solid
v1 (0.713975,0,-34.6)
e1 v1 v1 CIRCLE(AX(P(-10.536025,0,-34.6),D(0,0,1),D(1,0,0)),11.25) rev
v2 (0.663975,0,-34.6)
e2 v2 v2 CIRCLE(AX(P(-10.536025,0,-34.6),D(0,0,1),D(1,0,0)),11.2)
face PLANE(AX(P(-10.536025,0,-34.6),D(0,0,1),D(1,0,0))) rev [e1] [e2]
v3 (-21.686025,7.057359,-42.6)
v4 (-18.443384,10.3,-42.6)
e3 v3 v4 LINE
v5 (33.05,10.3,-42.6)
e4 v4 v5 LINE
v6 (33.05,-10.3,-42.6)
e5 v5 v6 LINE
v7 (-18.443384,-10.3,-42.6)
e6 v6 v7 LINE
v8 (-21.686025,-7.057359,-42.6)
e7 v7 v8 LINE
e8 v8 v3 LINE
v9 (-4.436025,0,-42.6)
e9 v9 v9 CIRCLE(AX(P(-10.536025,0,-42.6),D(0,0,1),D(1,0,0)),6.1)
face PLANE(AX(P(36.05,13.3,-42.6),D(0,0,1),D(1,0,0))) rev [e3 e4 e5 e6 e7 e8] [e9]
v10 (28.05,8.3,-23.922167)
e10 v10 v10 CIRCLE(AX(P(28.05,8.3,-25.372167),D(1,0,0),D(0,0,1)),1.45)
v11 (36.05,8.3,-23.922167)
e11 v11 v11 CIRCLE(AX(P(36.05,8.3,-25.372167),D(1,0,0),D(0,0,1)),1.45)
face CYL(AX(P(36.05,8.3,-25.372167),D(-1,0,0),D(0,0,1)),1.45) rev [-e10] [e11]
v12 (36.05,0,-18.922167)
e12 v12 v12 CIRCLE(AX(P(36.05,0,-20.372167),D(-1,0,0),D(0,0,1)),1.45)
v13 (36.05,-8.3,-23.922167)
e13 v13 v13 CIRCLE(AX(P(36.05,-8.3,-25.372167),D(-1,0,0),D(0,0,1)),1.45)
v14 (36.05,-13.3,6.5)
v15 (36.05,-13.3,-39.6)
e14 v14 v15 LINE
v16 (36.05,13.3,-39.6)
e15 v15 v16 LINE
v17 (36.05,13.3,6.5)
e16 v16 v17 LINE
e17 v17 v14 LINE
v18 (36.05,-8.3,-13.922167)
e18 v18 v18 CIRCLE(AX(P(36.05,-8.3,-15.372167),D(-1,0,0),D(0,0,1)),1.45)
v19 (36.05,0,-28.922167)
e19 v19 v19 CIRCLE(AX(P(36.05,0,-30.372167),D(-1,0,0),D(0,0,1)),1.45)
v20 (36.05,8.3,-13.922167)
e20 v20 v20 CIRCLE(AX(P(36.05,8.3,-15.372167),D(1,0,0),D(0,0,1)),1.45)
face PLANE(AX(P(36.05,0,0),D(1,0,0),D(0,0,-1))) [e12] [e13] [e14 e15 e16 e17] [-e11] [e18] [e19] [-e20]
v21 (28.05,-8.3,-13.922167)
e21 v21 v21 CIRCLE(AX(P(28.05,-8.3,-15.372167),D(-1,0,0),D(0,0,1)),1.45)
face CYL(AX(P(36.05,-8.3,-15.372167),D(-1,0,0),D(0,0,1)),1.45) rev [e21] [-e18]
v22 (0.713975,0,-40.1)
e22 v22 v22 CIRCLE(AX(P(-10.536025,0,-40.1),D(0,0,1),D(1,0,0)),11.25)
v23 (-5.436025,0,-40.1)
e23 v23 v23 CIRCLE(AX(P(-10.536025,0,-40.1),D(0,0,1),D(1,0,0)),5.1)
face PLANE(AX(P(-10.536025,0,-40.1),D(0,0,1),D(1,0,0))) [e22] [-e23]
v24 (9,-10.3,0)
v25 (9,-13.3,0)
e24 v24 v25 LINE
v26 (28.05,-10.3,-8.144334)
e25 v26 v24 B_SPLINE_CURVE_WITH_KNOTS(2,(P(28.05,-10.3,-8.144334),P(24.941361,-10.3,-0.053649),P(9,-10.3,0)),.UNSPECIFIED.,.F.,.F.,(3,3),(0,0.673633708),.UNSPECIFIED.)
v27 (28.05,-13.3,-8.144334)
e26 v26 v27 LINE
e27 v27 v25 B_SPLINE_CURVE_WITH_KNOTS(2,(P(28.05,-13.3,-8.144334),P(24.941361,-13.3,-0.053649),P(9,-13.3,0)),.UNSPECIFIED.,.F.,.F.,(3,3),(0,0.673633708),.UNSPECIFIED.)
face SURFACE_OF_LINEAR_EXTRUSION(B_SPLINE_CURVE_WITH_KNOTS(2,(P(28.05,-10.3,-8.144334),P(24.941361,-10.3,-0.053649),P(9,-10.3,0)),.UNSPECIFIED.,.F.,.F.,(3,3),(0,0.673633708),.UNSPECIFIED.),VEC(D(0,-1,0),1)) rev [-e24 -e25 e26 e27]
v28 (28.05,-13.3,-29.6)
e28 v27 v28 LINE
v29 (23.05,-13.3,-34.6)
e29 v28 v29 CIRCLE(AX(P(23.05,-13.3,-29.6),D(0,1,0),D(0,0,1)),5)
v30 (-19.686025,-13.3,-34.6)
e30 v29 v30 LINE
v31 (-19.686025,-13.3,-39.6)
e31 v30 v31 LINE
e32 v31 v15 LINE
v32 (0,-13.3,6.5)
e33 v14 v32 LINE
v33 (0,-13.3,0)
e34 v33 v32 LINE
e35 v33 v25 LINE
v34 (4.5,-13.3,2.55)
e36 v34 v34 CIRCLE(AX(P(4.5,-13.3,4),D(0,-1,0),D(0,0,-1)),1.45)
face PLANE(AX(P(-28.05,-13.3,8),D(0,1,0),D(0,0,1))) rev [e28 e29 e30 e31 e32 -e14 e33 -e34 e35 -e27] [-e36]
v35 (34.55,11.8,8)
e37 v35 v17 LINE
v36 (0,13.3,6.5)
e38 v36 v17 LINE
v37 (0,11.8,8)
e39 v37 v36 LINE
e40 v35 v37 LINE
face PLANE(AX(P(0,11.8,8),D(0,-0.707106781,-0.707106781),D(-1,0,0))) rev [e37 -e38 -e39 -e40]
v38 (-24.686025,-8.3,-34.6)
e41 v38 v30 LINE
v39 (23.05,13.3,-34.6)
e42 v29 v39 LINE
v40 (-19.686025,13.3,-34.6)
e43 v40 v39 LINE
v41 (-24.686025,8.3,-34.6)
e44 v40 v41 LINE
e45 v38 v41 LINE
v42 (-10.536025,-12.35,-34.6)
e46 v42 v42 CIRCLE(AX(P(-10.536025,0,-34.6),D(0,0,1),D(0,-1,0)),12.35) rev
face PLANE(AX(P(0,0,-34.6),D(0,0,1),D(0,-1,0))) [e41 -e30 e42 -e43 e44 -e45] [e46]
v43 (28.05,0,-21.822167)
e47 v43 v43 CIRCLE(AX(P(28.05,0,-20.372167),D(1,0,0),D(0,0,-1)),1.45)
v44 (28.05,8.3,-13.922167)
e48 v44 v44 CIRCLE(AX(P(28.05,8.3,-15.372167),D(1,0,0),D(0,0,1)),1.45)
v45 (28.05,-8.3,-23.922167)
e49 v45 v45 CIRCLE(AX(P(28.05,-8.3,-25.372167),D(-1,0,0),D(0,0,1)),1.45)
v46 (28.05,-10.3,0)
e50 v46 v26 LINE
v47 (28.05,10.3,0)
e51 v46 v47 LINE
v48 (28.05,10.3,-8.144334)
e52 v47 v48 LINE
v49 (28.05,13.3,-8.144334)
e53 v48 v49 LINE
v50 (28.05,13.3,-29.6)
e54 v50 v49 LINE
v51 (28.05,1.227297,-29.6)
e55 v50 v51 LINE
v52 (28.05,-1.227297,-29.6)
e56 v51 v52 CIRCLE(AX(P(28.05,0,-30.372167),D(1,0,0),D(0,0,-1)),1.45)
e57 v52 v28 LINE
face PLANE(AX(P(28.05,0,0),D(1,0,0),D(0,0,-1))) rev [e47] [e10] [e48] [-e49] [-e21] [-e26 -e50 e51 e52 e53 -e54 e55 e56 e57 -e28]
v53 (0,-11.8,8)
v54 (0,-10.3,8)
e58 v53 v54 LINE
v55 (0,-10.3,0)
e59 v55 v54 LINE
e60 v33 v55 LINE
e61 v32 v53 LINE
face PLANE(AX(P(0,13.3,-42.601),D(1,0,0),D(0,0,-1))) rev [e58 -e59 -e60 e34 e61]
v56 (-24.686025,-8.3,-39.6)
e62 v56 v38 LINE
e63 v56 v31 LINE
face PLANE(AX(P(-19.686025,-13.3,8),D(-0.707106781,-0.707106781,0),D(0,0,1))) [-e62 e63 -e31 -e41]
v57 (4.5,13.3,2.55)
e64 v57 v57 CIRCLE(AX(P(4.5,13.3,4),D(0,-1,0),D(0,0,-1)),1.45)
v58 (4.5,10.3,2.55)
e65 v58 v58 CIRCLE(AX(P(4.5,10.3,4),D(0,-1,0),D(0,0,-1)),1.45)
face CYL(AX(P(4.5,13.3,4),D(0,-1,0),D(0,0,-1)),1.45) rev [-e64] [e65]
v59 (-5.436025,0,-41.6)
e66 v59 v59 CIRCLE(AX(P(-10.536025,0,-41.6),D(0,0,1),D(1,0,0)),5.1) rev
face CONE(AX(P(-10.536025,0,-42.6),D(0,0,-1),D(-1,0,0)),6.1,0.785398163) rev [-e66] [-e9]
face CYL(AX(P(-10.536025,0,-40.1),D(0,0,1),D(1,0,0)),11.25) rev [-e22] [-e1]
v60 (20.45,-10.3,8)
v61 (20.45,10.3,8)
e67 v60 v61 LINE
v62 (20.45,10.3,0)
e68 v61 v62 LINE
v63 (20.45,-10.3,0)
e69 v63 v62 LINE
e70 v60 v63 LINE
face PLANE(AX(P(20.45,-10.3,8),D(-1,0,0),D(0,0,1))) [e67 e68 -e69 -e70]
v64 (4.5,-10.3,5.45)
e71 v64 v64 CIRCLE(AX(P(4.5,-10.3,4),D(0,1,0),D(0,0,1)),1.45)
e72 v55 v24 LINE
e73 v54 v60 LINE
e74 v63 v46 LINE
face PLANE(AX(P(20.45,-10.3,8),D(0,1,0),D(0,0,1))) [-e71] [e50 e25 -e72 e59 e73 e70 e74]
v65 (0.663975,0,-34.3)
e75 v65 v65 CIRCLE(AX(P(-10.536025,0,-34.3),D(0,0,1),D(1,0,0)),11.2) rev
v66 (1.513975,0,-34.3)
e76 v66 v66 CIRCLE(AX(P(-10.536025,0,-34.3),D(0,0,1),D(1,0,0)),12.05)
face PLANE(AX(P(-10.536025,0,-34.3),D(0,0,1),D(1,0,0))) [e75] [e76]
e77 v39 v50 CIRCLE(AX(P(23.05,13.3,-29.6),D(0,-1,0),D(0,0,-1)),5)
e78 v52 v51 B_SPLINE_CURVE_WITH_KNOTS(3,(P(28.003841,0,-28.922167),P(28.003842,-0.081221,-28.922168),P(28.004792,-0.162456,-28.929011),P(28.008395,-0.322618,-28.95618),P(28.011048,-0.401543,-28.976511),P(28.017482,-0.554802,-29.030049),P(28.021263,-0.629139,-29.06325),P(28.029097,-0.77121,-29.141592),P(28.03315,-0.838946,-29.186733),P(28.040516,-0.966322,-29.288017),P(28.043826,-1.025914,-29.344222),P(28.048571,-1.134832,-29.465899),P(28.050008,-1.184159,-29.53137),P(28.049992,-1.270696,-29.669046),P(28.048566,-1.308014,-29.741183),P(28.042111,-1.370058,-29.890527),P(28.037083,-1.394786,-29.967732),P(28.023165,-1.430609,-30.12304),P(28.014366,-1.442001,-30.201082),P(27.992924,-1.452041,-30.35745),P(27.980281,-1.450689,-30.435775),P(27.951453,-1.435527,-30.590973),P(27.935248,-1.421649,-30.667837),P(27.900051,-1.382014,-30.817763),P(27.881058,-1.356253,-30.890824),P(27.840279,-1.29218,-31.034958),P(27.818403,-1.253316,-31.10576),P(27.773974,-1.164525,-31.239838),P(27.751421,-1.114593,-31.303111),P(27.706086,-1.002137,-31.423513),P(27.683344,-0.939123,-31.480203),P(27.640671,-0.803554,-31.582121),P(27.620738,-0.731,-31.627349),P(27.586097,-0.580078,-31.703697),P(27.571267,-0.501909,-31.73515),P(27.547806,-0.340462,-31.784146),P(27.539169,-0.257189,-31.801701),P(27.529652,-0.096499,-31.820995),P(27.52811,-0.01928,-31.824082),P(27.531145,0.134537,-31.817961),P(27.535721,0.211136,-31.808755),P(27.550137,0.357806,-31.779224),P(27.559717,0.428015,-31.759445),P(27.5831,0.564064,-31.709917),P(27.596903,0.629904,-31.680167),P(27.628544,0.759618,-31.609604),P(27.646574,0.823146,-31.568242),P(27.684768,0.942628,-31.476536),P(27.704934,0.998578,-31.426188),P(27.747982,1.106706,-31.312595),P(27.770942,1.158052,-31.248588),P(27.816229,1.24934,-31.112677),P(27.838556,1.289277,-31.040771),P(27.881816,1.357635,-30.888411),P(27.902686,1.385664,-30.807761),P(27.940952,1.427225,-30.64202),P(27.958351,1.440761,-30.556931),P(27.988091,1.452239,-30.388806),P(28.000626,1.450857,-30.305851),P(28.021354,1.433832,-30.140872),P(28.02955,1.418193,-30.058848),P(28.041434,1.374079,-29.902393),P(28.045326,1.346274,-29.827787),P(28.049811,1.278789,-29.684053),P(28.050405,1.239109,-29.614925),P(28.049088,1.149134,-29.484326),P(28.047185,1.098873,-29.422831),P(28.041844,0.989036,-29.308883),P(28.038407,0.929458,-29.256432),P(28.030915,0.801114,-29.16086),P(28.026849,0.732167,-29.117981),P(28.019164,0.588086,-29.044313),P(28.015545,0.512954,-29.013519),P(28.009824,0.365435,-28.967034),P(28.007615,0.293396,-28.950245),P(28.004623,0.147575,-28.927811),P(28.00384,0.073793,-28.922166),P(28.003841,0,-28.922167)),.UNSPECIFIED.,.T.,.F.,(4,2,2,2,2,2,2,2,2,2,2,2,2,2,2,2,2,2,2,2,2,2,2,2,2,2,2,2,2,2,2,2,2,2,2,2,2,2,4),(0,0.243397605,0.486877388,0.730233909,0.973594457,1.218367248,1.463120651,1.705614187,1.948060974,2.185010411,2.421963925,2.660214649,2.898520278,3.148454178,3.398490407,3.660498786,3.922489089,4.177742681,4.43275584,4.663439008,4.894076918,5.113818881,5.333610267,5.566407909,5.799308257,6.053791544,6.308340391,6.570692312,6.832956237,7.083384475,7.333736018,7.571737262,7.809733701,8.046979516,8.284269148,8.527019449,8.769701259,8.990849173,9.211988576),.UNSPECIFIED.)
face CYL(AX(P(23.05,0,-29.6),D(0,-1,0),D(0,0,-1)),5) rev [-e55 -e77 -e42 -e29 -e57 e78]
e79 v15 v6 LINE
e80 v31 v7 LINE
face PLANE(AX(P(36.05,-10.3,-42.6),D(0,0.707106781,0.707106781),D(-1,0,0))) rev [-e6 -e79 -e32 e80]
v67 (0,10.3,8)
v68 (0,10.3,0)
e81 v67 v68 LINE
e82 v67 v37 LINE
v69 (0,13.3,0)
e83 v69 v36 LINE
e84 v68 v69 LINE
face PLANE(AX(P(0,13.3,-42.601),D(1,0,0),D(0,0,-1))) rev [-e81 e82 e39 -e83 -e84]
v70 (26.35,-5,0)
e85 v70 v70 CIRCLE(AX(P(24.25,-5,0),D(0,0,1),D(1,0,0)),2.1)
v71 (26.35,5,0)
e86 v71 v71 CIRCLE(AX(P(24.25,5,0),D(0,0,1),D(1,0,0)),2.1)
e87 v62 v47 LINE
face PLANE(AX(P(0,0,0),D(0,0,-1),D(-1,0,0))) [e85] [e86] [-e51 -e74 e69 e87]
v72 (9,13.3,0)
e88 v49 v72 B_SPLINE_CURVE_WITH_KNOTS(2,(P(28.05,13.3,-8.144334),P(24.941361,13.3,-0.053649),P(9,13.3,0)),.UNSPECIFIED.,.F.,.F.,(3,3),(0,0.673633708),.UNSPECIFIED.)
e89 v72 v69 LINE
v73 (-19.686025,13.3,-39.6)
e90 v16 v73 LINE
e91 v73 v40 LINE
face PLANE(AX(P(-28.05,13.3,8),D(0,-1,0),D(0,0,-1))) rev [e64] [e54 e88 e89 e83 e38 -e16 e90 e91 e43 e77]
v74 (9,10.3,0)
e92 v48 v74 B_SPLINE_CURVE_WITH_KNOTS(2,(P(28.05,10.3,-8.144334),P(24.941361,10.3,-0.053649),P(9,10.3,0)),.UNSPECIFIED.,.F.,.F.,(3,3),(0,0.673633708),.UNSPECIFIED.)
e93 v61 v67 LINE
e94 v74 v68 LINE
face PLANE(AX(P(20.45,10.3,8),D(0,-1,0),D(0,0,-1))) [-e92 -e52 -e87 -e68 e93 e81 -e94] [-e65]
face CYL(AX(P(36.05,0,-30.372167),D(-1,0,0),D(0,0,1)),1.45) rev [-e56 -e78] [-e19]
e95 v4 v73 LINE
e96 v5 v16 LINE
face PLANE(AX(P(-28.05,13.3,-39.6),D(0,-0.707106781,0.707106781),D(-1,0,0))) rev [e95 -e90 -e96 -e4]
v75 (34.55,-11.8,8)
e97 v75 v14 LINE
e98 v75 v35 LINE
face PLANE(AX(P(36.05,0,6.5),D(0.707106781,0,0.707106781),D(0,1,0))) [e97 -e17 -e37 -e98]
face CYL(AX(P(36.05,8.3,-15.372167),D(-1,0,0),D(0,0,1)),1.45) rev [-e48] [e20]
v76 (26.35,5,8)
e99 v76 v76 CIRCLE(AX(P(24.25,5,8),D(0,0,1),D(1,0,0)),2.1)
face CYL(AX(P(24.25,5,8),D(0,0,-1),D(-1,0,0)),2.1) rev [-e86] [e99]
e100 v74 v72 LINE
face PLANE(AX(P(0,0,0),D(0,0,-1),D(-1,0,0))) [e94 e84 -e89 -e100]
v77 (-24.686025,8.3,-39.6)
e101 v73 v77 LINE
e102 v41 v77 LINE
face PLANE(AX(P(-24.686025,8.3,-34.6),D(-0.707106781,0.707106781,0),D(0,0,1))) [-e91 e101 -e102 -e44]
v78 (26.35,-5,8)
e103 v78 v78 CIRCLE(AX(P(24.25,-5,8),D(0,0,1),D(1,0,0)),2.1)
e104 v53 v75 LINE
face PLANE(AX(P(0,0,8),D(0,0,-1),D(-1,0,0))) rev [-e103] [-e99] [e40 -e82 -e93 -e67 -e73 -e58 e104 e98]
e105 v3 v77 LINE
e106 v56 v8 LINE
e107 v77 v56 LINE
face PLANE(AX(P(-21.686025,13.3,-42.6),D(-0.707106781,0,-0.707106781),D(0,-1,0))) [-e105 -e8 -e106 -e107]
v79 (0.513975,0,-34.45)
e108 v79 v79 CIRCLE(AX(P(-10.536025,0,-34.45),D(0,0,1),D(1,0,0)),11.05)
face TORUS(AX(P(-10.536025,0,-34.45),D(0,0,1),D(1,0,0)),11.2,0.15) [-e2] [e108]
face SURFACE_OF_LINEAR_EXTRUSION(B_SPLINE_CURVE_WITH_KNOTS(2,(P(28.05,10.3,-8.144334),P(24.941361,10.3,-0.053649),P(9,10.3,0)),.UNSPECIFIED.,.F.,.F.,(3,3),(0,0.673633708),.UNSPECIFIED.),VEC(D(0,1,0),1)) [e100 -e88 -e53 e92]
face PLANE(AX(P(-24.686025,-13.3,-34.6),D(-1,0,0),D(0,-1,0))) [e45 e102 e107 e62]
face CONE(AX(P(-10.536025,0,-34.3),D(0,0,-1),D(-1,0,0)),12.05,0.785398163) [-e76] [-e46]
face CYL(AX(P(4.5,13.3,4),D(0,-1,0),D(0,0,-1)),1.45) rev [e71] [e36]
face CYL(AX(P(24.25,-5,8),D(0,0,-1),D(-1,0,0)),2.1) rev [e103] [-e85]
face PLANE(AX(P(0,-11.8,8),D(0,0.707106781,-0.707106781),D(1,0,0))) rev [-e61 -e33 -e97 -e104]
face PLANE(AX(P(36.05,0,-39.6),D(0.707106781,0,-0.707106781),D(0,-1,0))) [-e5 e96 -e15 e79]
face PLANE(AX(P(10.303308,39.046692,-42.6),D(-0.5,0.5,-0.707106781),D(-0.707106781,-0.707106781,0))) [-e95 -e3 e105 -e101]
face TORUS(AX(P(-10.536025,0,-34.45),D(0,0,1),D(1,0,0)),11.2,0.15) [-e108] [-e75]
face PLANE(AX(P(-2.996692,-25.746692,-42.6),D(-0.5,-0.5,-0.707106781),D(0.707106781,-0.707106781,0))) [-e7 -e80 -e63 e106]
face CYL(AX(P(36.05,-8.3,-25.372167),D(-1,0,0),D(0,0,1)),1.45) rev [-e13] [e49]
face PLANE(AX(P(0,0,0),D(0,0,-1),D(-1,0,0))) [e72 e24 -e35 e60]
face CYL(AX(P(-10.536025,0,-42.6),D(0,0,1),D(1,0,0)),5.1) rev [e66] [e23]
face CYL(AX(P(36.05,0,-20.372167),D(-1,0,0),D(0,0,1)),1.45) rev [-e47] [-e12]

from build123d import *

# Parameters (mm, degrees)
CROQUIS1_W                 = 56.1
CROQUIS1_H                 = 26.6
CROQUIS1_R                 = 2.1
CROQUIS1_W_2               = 40.9
CROQUIS1_H_2               = 20.6
SALIENTE_EXTRUIR1_DEPTH    = 8
CROQUIS2_W                 = 50.6
CROQUIS2_H                 = 26.6
SALIENTE_EXTRUIR2_DEPTH    = 8
CROQUIS3_W                 = 60.73602496
CROQUIS3_H                 = 26.6
SALIENTE_EXTRUIR3_DEPTH    = 8
CROQUIS4_R                 = 11.25
CORTAR_EXTRUIR1_DEPTH      = 5.5
CROQUIS5_R                 = 5.1
CORTAR_EXTRUIR2_DEPTH      = 62.563808362
CROQUIS6_R                 = 12.05
CROQUIS6_R_2               = 11.05
SALIENTE_EXTRUIR4_DEPTH    = 0.3
CHAFL_N1_SIZE              = 0.3
REDONDEO1_R                = 0.15
CHAFL_N2_SIZE              = 5
CORTAR_EXTRUIR5_REACH      = 65.536
CROQUIS11_W                = 30.047801794
CROQUIS11_H                = 26.6
CROQUIS12_R                = 1.45
CORTAR_EXTRUIR6_DEPTH      = 62.821699265
CHAFL_N8_SIZE              = 3
CHAFL_N9_SIZE              = 1
CHAFL_N10_SIZE             = 1.5
SALIENTE_EXTRUIR7_DEPTH    = 3
REDONDEO3_R                = 5
CROQUIS14_R                = 1.45
CORTAR_EXTRUIR7_DEPTH      = 70.085008007
CORTAR_EXTRUIR8_DEPTH      = 70.085008007
CORTAR_EXTRUIR8_DEPTH_BACK = 70.085008007
CROQUIS15_R                = 1.45


with BuildPart() as part:
    # Croquis1 → Saliente-Extruir1 (new body)
    with BuildSketch(Plane.XY):
        Rectangle(CROQUIS1_W, CROQUIS1_H)
        with Locations((24.250000128, -5)):
            Circle(CROQUIS1_R, mode=Mode.SUBTRACT)
        with Locations((24.250000128, 5)):
            Circle(CROQUIS1_R, mode=Mode.SUBTRACT)
        with Locations((-24.249999872, -5)):
            Circle(CROQUIS1_R, mode=Mode.SUBTRACT)
        with Locations((-24.249999872, 5)):
            Circle(CROQUIS1_R, mode=Mode.SUBTRACT)
        Rectangle(CROQUIS1_W_2, CROQUIS1_H_2, mode=Mode.SUBTRACT)
    extrude(amount=SALIENTE_EXTRUIR1_DEPTH)

    # Croquis2 → Saliente-Extruir2 (add)
    with BuildSketch(Plane(origin=(28.05, 0, 0), x_dir=(0, 0, -1), z_dir=(1, 0, 0))):
        with Locations((17.3, 0)):
            Rectangle(CROQUIS2_W, CROQUIS2_H)
    extrude(amount=SALIENTE_EXTRUIR2_DEPTH)

    # Croquis3 → Saliente-Extruir3 (add)
    with BuildSketch(Plane(origin=(0, 0, -42.6), x_dir=(-1, 0, 0), z_dir=(0, 0, -1))):
        with Locations((-5.68198752, 0)):
            Rectangle(CROQUIS3_W, CROQUIS3_H)
    extrude(amount=-SALIENTE_EXTRUIR3_DEPTH)

    # Croquis4 → Cortar-Extruir1 (cut)
    with BuildSketch(Plane.XY.offset(-34.6)):
        with Locations((-10.53602496, 0)):
            Circle(CROQUIS4_R)
    extrude(amount=-CORTAR_EXTRUIR1_DEPTH, mode=Mode.SUBTRACT)

    # Croquis5 → Cortar-Extruir2 (cut, through all)
    with BuildSketch(Plane.XY.offset(-40.1)):
        with Locations((-10.53602496, 0)):
            Circle(CROQUIS5_R)
    extrude(amount=-CORTAR_EXTRUIR2_DEPTH, mode=Mode.SUBTRACT)

    # Croquis6 → Saliente-Extruir4 (add)
    with BuildSketch(Plane.XY.offset(-34.6)):
        with Locations((-10.53602496, 0)):
            Circle(CROQUIS6_R)
        with Locations((-10.53602496, 0)):
            Circle(CROQUIS6_R_2, mode=Mode.SUBTRACT)
    extrude(amount=SALIENTE_EXTRUIR4_DEPTH)

    # Chaflán1
    chafl_n1_edges = [part.edges().sort_by_distance(p)[0] for p in [
        (-22.58602496, 0, -34.6),
    ]]
    chamfer(chafl_n1_edges, length=CHAFL_N1_SIZE - 0.0001)  # a hair under: the kernel refuses the full size

    # Redondeo1
    redondeo1_edges = [part.edges().sort_by_distance(p)[0] for p in [
        (-21.58602496, 0, -34.6),
        (-21.58602496, 0, -34.3),
    ]]
    fillet(redondeo1_edges, radius=REDONDEO1_R - 0.0001)  # a hair under: the kernel refuses the full size

    # Chaflán2
    chafl_n2_edges = [part.edges().sort_by_distance(p)[0] for p in [
        (-24.68602496, -13.3, -38.6),
        (-24.68602496, 13.3, -38.6),
    ]]
    chamfer(chafl_n2_edges, length=CHAFL_N2_SIZE)

    # Croquis11 → Cortar-Extruir5 (cut, up to next)
    with BuildSketch(Plane.XY.offset(8), mode=Mode.PRIVATE) as cortar_extruir5_sk1:
        with Locations((-15.023900897, 0)):
            Rectangle(CROQUIS11_W, CROQUIS11_H)
    cortar_extruir5_tool1 = extrude(cortar_extruir5_sk1.sketch, amount=-CORTAR_EXTRUIR5_REACH, mode=Mode.PRIVATE) & part.part
    add(cortar_extruir5_tool1.solids().sort_by_distance((-15.023901, 0, 8))[0], mode=Mode.SUBTRACT)

    # Croquis12 → Cortar-Extruir6 (cut, through all)
    with BuildSketch(Plane(origin=(0, -13.3, 0), x_dir=(-1, 0, 0), z_dir=(0, -1, 0))):
        with Locations(Location((-4.5, -4, 0), (0, 0, 90))):
            Circle(CROQUIS12_R)
    extrude(amount=-CORTAR_EXTRUIR6_DEPTH, mode=Mode.SUBTRACT)

    # Chaflán8
    chafl_n8_edges = [part.edges().sort_by_distance(p)[0] for p in [
        (-24.68602496, 0, -42.6),
        (-22.18602496, -10.8, -42.6),
        (-22.18602496, 10.8, -42.6),
        (8.18198752, -13.3, -42.6),
        (8.18198752, 13.3, -42.6),
        (36.05, 0, -42.6),
    ]]
    chamfer(chafl_n8_edges, length=CHAFL_N8_SIZE)

    # Chaflán9
    chafl_n9_edges = [part.edges().sort_by_distance(p)[0] for p in [
        (-15.63602496, 0, -42.6),
    ]]
    chamfer(chafl_n9_edges, length=CHAFL_N9_SIZE)

    # Chaflán10
    chafl_n10_edges = [part.edges().sort_by_distance(p)[0] for p in [
        (18.025, -13.3, 8),
        (36.05, 0, 8),
        (18.025, 13.3, 8),
    ]]
    chamfer(chafl_n10_edges, length=CHAFL_N10_SIZE)

    # Croquis13 → Saliente-Extruir7 (add)
    with BuildSketch(Plane(origin=(0, 13.3, 0), x_dir=(1, 0, 0), z_dir=(0, 1, 0))):
        with BuildLine():
            Line((28.05, 8.144334064), (28.05, 0))
            Line((28.05, 0), (9, 0))
            add(Edge.make_bspline(
                [(9, 0), (24.941361066, 0.053648998), (28.05, 8.144334064)],
                knots=[0, 0, 0, 0.673633708, 0.673633708, 0.673633708], degree=2))
        make_face()
    saliente_extruir7 = extrude(amount=-SALIENTE_EXTRUIR7_DEPTH)

    # Simetría7: Saliente-Extruir7 across plane
    add(saliente_extruir7.mirror(Plane.ZX))

    # Redondeo3
    redondeo3_edges = [part.edges().sort_by_distance(p)[0] for p in [
        (28.05, 0, -34.6),
    ]]
    fillet(redondeo3_edges, radius=REDONDEO3_R)

    # Croquis14 → Cortar-Extruir7 (cut, through all)
    with BuildSketch(Plane.ZY.offset(-28.05)):
        with Locations((-15.372167032, -8.3)):
            Circle(CROQUIS14_R)
        with Locations((-25.372167032, -8.3)):
            Circle(CROQUIS14_R)
    cortar_extruir7 = extrude(amount=-CORTAR_EXTRUIR7_DEPTH, mode=Mode.SUBTRACT)

    # Simetría8: Cortar-Extruir7 across plane
    add(cortar_extruir7.mirror(Plane.ZX), mode=Mode.SUBTRACT)

    # Croquis15 → Cortar-Extruir8 (cut, two sides: drawn at the far end of the back side and taken through both)
    with BuildSketch(Plane.ZY.offset(-28.05).offset(-CORTAR_EXTRUIR8_DEPTH_BACK)):
        with Locations((-20.372167032, 0)):
            Circle(CROQUIS15_R)
        with Locations((-30.372167032, 0)):
            Circle(CROQUIS15_R)
    extrude(amount=CORTAR_EXTRUIR8_DEPTH + CORTAR_EXTRUIR8_DEPTH_BACK, mode=Mode.SUBTRACT)


solid = part.part
